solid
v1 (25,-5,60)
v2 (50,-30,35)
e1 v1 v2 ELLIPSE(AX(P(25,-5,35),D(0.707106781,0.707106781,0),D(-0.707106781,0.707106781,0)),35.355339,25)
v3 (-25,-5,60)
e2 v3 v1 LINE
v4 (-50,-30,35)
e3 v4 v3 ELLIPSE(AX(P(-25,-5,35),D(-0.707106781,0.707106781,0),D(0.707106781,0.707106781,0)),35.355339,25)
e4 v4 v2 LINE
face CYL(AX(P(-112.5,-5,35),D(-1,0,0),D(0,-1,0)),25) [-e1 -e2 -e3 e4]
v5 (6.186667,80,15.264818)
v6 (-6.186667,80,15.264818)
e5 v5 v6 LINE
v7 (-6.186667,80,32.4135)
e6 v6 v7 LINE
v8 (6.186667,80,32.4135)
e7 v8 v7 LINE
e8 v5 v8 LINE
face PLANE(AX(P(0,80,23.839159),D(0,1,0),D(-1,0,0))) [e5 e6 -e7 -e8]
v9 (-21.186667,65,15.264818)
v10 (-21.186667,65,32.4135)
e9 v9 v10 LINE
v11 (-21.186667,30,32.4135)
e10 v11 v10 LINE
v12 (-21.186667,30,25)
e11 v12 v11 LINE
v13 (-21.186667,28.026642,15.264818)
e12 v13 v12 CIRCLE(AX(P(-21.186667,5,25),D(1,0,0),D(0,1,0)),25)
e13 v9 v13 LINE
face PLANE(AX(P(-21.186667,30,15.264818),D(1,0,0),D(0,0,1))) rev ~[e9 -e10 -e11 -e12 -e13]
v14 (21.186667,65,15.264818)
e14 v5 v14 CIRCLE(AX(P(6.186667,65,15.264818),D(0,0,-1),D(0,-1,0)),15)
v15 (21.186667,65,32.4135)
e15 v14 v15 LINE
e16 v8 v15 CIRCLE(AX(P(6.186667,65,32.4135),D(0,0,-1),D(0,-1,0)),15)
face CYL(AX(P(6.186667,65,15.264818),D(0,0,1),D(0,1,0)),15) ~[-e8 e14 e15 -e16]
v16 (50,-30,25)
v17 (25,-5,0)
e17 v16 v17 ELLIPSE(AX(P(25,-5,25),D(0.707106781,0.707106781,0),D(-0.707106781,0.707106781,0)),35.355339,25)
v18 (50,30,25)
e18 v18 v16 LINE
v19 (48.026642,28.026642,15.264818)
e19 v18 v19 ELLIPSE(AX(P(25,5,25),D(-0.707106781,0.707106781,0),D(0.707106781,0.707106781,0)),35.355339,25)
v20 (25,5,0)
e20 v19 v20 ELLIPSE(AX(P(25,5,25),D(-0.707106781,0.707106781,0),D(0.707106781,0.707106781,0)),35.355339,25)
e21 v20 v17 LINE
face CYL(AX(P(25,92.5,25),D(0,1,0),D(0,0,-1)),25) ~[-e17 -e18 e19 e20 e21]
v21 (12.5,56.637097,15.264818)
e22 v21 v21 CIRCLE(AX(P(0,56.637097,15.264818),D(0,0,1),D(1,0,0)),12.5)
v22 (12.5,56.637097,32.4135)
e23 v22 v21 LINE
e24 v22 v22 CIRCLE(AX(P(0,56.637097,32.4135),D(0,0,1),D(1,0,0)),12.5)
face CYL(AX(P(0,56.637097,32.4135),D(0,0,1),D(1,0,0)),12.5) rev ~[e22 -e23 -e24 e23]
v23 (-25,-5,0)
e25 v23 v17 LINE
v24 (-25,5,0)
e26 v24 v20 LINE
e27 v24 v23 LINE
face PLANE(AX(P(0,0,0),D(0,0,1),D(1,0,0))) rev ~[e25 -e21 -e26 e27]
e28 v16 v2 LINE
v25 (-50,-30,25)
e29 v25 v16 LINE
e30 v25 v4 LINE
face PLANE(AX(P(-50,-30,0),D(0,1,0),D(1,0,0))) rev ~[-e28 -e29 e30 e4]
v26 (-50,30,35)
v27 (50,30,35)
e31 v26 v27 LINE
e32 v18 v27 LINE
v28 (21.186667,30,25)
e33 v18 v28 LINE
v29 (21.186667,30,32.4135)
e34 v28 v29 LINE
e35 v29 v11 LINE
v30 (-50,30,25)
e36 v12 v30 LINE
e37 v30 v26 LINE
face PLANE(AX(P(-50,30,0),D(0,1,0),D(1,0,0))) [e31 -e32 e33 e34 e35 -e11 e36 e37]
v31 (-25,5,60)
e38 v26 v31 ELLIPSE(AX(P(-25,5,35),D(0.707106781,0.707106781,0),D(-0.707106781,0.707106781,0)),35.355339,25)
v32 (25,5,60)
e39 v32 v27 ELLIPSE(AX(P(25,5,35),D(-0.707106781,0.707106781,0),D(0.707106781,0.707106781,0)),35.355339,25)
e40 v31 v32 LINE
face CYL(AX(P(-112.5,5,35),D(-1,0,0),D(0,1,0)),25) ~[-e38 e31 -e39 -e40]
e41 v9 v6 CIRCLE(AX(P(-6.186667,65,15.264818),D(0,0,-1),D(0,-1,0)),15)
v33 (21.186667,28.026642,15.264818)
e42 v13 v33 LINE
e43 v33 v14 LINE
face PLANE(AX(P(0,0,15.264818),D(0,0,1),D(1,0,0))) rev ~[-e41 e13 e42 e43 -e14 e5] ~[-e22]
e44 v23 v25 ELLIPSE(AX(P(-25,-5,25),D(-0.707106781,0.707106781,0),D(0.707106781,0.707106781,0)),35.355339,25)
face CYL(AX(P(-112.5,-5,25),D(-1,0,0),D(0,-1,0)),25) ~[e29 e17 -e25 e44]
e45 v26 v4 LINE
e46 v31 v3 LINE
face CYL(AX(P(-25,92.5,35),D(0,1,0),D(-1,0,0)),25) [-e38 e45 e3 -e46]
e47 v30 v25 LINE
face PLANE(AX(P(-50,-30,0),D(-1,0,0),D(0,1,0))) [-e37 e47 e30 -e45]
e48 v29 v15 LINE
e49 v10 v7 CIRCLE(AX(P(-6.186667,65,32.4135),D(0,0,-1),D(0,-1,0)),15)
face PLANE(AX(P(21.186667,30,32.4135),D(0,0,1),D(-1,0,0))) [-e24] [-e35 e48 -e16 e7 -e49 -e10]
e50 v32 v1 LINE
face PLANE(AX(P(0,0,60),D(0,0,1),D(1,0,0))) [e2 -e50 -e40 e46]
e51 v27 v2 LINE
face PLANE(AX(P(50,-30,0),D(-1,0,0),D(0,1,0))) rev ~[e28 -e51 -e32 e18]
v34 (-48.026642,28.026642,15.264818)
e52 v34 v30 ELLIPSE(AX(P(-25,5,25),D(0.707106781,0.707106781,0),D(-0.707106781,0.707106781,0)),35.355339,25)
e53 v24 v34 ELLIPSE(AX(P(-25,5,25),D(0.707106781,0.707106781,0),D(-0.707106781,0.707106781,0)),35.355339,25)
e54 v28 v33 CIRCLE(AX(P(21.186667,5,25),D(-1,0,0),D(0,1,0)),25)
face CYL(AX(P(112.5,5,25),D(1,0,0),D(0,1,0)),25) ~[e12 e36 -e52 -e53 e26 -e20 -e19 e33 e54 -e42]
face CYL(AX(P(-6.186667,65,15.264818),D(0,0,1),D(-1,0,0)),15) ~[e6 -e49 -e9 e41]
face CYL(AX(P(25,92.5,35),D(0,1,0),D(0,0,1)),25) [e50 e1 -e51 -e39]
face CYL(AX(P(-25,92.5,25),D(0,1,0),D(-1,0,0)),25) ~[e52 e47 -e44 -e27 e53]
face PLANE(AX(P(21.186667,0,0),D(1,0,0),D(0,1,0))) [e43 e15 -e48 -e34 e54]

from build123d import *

# Parameters (mm, degrees)
F0_W         = 100
F0_H         = 60
F1_DEPTH     = 60
F2_W         = 42.3733331263
F2_H         = 17.1486828476
F3_DEPTH     = 50
F4_R         = 12.5
F5_DEPTH     = 32.4145003611
F6_T1_DEPTH  = 185
F6_T3_DEPTH  = 225
F6_T8_DEPTH  = 225
F6_T14_DEPTH = 225
F6_T20_DEPTH = 225
F6_T27_DEPTH = 225
F6_T33_DEPTH = 225
F7_R         = 15


# Not quite as in the source:
# - a fillet or chamfer that OpenCascade refuses, or shapes differently, is made with other operations: its cross-section is extruded or revolved along the edge and cut away or added


with BuildPart() as f1:
    # F0 (on Top) → F1 (new body)
    with BuildSketch(Plane.XY):
        Rectangle(F0_W, F0_H)
    extrude(amount=F1_DEPTH)

    # F2 (on face) → F3 (join)
    with BuildSketch(Plane(origin=(0, 30, 0), x_dir=(-1, 0, 0), z_dir=(0, 1, 0))):
        with Locations((0, 23.8391589373)):
            Rectangle(F2_W, F2_H)
    extrude(amount=F3_DEPTH)

    # F4 (on face) → F5 (cut, through all)
    with BuildSketch(Plane.XY.offset(32.4135003611)):
        with Locations((0, 56.6370971501)):
            Circle(F4_R)
    extrude(amount=-F5_DEPTH, mode=Mode.SUBTRACT)

    # F6: fillet of radius 25 on 8 edges, made by hand

    # F6_s2 → F6_t1 (cut)
    with BuildSketch(Plane.XZ.offset(-92.5)):
        with BuildLine():
            ThreePointArc((-50, 35), (-42.6776695297, 52.6776695297), (-25, 60))
            Line((-25, 60), (-50, 60))
            Line((-50, 60), (-50, 35))
        make_face()
        with BuildLine():
            ThreePointArc((25, 60), (42.6776695297, 52.6776695297), (50, 35))
            Line((50, 35), (50, 60))
            Line((50, 60), (25, 60))
        make_face()
        with BuildLine():
            ThreePointArc((-50, 25), (-42.6776695297, 7.3223304703), (-25, 0))
            Line((-25, 0), (-50, 0))
            Line((-50, 0), (-50, 25))
        make_face()
        with BuildLine():
            ThreePointArc((25, 0), (42.6776695297, 7.3223304703), (50, 25))
            Line((50, 25), (50, 0))
            Line((50, 0), (25, 0))
        make_face()
    extrude(amount=F6_T1_DEPTH, mode=Mode.SUBTRACT)

    # F6_s4 → F6_t3 (cut)
    with BuildSketch(Plane.YZ.offset(-112.5)):
        with BuildLine():
            ThreePointArc((-30, 35), (-22.6776695297, 52.6776695297), (-5, 60))
            Line((-5, 60), (-30, 60))
            Line((-30, 60), (-30, 35))
        make_face()
        with BuildLine():
            ThreePointArc((30, 35), (22.6776695297, 52.6776695297), (5, 60))
            Line((5, 60), (30, 60))
            Line((30, 60), (30, 35))
        make_face()
        with BuildLine():
            ThreePointArc((-30, 25), (-22.6776695297, 7.3223304703), (-5, 0))
            Line((-5, 0), (-30, 0))
            Line((-30, 0), (-30, 25))
        make_face()
    extrude(amount=F6_T3_DEPTH, mode=Mode.SUBTRACT)


with BuildPart() as f6_tool6:
    # F6_s7 → F6_t8 (new body)
    with BuildSketch(Plane.YZ.offset(112.5)):
        with BuildLine():
            ThreePointArc((30, 25), (22.6776695297, 7.3223304703), (5, 0))
            Line((5, 0), (30, 0))
            Line((30, 0), (30, 25))
        make_face()
    extrude(amount=-F6_T8_DEPTH)

    split(bisect_by=Plane.XY.offset(15.2648175135), keep=Keep.TOP)

    split(bisect_by=Plane.YZ.offset(21.1866665632), keep=Keep.TOP)


with BuildPart() as f1_1:
    add(f1.part)

    # F6_t5: cut F6_tool6
    add(f6_tool6.part, mode=Mode.SUBTRACT)


with BuildPart() as f6_tool12:
    # F6_s13 → F6_t14 (new body)
    with BuildSketch(Plane.YZ.offset(112.5)):
        with BuildLine():
            ThreePointArc((30, 25), (22.6776695297, 7.3223304703), (5, 0))
            Line((5, 0), (30, 0))
            Line((30, 0), (30, 25))
        make_face()
    extrude(amount=-F6_T14_DEPTH)

    split(bisect_by=Plane.XY.offset(15.2648175135), keep=Keep.BOTTOM)

    split(bisect_by=Plane.YZ.offset(21.1866665632), keep=Keep.TOP)


with BuildPart() as f1_2:
    add(f1_1.part)

    # F6_t11: cut F6_tool12
    add(f6_tool12.part, mode=Mode.SUBTRACT)


with BuildPart() as f6_tool18:
    # F6_s19 → F6_t20 (new body)
    with BuildSketch(Plane.YZ.offset(112.5)):
        with BuildLine():
            ThreePointArc((30, 25), (22.6776695297, 7.3223304703), (5, 0))
            Line((5, 0), (30, 0))
            Line((30, 0), (30, 25))
        make_face()
    extrude(amount=-F6_T20_DEPTH)

    split(bisect_by=Plane.XY.offset(15.2648175135), keep=Keep.BOTTOM)

    split(bisect_by=Plane.YZ.offset(21.1866665632), keep=Keep.BOTTOM)

    split(bisect_by=Plane.YZ.offset(-21.1866665632), keep=Keep.TOP)


with BuildPart() as f1_3:
    add(f1_2.part)

    # F6_t17: cut F6_tool18
    add(f6_tool18.part, mode=Mode.SUBTRACT)


with BuildPart() as f6_tool25:
    # F6_s26 → F6_t27 (new body)
    with BuildSketch(Plane.YZ.offset(112.5)):
        with BuildLine():
            ThreePointArc((30, 25), (22.6776695297, 7.3223304703), (5, 0))
            Line((5, 0), (30, 0))
            Line((30, 0), (30, 25))
        make_face()
    extrude(amount=-F6_T27_DEPTH)

    split(bisect_by=Plane.XY.offset(15.2648175135), keep=Keep.TOP)

    split(bisect_by=Plane.YZ.offset(-21.1866665632), keep=Keep.BOTTOM)


with BuildPart() as f1_4:
    add(f1_3.part)

    # F6_t24: cut F6_tool25
    add(f6_tool25.part, mode=Mode.SUBTRACT)


with BuildPart() as f6_tool31:
    # F6_s32 → F6_t33 (new body)
    with BuildSketch(Plane.YZ.offset(112.5)):
        with BuildLine():
            ThreePointArc((30, 25), (22.6776695297, 7.3223304703), (5, 0))
            Line((5, 0), (30, 0))
            Line((30, 0), (30, 25))
        make_face()
    extrude(amount=-F6_T33_DEPTH)

    split(bisect_by=Plane.XY.offset(15.2648175135), keep=Keep.BOTTOM)

    split(bisect_by=Plane.YZ.offset(-21.1866665632), keep=Keep.BOTTOM)


with BuildPart() as f1_5:
    add(f1_4.part)

    # F6_t30: cut F6_tool31
    add(f6_tool31.part, mode=Mode.SUBTRACT)

    # F7
    f7_edges = [f1_5.edges().sort_by_distance(p)[0] for p in [
        (-21.186667, 80, 23.839159),
        (21.186667, 80, 23.839159),
    ]]
    fillet(f7_edges, radius=F7_R)


solid = f1_5.part
